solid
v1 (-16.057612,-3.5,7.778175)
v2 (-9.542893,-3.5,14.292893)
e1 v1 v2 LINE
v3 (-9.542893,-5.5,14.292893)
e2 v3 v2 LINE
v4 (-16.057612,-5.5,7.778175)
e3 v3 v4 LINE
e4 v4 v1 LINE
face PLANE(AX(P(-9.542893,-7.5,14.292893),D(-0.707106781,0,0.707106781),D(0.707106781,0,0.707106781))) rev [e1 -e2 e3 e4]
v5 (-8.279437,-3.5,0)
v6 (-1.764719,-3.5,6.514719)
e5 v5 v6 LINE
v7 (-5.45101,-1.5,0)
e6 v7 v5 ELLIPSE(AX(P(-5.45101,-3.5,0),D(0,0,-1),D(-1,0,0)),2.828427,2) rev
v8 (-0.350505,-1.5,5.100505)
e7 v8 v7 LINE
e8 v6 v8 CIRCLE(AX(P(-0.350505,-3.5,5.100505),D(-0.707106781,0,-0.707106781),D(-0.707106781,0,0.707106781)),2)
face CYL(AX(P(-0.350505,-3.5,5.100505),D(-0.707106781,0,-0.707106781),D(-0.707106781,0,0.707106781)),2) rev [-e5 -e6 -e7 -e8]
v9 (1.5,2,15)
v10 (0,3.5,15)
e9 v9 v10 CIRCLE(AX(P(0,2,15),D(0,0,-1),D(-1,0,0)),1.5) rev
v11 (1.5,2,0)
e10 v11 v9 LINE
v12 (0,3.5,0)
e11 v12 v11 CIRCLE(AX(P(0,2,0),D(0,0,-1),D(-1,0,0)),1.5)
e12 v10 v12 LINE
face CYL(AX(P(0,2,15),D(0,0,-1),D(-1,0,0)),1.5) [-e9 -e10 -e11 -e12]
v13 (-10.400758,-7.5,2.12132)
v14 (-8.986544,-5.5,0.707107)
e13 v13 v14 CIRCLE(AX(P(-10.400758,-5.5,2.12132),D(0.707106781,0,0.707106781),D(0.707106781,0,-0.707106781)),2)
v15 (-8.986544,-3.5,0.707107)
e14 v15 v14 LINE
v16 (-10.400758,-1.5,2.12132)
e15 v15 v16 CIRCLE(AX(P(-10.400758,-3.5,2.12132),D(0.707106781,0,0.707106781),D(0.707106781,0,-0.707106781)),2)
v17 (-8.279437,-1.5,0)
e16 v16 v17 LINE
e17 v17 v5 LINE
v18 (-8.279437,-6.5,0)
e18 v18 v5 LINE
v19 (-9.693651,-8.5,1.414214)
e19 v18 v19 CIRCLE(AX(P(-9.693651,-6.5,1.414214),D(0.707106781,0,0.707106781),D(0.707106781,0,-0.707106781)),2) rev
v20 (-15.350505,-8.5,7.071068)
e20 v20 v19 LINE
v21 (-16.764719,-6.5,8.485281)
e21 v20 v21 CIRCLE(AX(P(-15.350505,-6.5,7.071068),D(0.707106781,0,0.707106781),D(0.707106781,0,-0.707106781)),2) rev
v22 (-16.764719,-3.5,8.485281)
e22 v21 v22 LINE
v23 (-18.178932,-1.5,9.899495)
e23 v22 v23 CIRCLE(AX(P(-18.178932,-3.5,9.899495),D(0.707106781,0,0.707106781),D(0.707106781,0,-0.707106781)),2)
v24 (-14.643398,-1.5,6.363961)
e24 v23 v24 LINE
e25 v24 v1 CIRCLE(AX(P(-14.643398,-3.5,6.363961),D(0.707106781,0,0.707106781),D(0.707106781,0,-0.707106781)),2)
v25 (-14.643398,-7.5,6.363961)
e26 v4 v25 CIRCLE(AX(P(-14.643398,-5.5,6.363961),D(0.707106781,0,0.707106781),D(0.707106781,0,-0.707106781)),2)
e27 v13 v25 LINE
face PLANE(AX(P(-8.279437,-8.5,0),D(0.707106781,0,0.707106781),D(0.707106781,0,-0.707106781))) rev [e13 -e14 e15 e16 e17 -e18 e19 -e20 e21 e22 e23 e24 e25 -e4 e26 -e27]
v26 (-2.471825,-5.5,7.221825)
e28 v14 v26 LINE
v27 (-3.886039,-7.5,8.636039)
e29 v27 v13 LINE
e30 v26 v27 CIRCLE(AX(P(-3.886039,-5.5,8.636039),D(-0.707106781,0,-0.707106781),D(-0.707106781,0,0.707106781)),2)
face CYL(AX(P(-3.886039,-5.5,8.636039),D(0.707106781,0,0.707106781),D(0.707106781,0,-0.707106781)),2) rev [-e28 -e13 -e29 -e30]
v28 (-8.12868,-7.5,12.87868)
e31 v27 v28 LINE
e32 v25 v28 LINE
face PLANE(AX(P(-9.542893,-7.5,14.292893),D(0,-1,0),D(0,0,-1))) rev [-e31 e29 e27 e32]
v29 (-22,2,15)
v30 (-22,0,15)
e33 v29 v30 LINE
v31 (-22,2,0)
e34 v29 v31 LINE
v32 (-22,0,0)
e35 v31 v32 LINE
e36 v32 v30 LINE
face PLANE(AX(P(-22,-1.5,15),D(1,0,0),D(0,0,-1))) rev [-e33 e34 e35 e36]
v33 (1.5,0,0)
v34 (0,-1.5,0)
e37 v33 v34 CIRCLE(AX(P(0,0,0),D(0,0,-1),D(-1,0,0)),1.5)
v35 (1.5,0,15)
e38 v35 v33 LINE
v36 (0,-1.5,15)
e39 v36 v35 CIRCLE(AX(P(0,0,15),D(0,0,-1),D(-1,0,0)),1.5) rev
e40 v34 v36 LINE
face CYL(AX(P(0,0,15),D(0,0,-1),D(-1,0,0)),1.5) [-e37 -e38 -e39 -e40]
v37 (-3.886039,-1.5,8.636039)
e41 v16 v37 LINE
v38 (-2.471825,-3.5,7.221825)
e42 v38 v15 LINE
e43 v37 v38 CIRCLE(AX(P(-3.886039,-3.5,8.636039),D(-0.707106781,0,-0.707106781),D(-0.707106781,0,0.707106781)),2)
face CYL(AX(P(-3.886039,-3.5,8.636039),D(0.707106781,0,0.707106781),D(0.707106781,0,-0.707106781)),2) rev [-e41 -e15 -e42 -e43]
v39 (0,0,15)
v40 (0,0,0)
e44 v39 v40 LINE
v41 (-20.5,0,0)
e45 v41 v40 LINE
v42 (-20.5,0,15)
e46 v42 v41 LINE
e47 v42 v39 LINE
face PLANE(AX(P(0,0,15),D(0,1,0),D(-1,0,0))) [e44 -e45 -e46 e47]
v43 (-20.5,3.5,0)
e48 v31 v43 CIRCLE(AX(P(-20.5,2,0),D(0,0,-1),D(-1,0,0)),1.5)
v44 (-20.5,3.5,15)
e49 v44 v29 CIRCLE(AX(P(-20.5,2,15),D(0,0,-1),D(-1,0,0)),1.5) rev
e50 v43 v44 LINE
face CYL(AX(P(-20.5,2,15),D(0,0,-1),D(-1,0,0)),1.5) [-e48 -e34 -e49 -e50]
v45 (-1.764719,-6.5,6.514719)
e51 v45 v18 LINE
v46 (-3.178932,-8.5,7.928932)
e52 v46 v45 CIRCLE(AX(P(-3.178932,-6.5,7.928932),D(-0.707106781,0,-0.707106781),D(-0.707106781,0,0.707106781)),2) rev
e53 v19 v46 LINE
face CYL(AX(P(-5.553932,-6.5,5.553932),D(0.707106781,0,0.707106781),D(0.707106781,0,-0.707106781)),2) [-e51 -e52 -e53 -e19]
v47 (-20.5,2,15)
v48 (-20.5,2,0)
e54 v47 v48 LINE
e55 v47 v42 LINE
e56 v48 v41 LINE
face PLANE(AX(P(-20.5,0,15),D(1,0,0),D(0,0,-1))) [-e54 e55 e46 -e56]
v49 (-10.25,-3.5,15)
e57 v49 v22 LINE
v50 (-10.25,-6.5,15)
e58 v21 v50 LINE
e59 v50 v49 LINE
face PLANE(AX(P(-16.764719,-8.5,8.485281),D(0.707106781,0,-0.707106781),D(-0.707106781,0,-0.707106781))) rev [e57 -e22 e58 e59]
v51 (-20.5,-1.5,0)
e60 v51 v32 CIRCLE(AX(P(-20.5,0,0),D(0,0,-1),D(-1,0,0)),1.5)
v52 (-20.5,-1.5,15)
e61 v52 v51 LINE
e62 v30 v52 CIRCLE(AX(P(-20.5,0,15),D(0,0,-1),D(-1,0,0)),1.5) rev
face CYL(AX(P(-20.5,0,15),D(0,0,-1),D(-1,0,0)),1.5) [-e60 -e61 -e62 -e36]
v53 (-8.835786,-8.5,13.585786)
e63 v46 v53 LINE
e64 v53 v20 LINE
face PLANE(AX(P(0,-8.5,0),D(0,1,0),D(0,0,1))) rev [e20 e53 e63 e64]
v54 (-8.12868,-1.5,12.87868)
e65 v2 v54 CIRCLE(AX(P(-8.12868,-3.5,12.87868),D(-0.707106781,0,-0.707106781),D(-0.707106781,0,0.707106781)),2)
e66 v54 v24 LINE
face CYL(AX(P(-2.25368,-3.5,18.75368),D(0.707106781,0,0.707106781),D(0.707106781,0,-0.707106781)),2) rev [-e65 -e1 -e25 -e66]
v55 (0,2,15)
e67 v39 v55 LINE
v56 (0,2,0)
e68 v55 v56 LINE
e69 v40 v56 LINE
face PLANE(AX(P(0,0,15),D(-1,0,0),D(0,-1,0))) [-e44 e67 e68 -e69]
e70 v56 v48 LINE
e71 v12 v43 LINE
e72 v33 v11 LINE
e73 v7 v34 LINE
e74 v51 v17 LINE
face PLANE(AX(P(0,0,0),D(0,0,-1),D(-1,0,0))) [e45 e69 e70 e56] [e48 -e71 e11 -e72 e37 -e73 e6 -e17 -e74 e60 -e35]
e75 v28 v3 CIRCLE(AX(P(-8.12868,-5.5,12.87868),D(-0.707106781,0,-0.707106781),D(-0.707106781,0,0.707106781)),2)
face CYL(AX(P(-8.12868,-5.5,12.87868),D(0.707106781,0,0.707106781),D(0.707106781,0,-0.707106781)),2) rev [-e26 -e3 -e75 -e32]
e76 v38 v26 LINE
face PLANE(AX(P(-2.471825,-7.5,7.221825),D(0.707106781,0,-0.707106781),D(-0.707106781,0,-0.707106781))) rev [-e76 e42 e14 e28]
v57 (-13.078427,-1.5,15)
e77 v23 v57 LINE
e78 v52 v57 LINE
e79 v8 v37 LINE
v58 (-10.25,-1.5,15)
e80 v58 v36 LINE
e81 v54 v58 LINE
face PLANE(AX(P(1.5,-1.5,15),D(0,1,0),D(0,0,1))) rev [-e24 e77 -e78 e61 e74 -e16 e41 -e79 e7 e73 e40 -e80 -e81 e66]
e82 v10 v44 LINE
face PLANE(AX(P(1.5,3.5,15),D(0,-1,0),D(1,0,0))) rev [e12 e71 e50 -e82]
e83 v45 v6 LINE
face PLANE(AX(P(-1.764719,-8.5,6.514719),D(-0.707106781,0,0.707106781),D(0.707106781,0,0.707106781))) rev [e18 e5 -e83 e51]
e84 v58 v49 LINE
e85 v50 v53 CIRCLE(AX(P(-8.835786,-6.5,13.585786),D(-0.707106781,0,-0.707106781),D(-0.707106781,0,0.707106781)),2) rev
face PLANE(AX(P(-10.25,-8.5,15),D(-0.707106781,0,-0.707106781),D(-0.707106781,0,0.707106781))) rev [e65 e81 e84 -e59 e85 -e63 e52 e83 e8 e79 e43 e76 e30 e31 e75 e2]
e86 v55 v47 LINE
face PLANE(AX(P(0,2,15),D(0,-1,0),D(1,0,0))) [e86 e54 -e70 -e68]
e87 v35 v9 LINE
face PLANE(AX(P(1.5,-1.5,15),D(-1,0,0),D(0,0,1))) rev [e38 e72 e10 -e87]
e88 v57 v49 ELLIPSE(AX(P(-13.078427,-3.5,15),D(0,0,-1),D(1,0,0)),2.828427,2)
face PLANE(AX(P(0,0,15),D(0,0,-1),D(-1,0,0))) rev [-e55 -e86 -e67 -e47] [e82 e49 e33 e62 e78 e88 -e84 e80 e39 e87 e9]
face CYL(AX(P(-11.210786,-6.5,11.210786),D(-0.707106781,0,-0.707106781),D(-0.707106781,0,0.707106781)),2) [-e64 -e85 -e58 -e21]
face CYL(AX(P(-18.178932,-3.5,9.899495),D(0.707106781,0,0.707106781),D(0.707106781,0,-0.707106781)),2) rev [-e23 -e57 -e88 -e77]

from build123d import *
from OCP.BRepAlgoAPI import BRepAlgoAPI_Cut
from OCP.TopTools import TopTools_ListOfShape

# Parameters (mm, degrees)
CROQUIS1_W              = 23.5
CROQUIS1_H              = 5
CROQUIS1_W_2            = 20.5
CROQUIS1_H_2            = 2
SALIENTE_EXTRUIR1_DEPTH = 15
SALIENTE_EXTRUIR2_DEPTH = 7
CROQUIS3_W              = 10
CROQUIS3_H              = 6
CORTAR_EXTRUIR1_DEPTH   = 9.213203
REDONDEO1_START         = -5.854446225
REDONDEO1_DEPTH         = 9.213203436
REDONDEO1_2_DEPTH       = 9.213203436
REDONDEO1_3_DEPTH       = 0.946564521
REDONDEO1_START_2       = 2.41219269
REDONDEO1_4_DEPTH       = 0.946564521
REDONDEO1_5_DEPTH       = 9.213203436
REDONDEO1_START_3       = -2
REDONDEO1_6_OUTLINE_W   = 11
REDONDEO1_6_OUTLINE_H   = 2.5
REDONDEO1_6_DEPTH       = 2
REDONDEO1_START_4       = 15
REDONDEO1_7_OUTLINE_W   = 11
REDONDEO1_7_OUTLINE_H   = 2.5
REDONDEO1_7_DEPTH       = 2
REDONDEO2_R             = 1.5


with BuildPart() as part:
    # Croquis1 → Saliente-Extruir1 (new body)
    with BuildSketch(Plane.XY):
        with Locations((-10.25, 1)):
            Rectangle(CROQUIS1_W, CROQUIS1_H)
        with Locations((-10.25, 1)):
            Rectangle(CROQUIS1_W_2, CROQUIS1_H_2, mode=Mode.SUBTRACT)
    extrude(amount=SALIENTE_EXTRUIR1_DEPTH)

    # Croquis2 → Saliente-Extruir2 (add)
    with BuildSketch(Plane.XZ.offset(1.5)):
        Polygon((-10.25, 15), (-1.764718626, 6.514718626), (-8.279437252, 0), (-16.764718626, 8.485281374), align=None)
    extrude(amount=SALIENTE_EXTRUIR2_DEPTH)


with BuildPart() as cortar_extruir1_tool:
    # Croquis3 → Cortar-Extruir1 (new body)
    with BuildSketch(Plane(origin=(-4.139718626, 0, -4.139718626), x_dir=(-0.7071067811865468, 0, 0.7071067811865482), z_dir=(-0.7071067811865482, 0, -0.7071067811865468))):
        with Locations((11.854446225, -4.5)):
            Rectangle(CROQUIS3_W, CROQUIS3_H)
    extrude(amount=-CORTAR_EXTRUIR1_DEPTH)


with BuildPart() as part_1:
    add(part.part)

    # Cortar-Extruir1: cut by cortar_extruir1_tool, with a tolerance
    cortar_extruir1_stock = TopTools_ListOfShape()
    cortar_extruir1_stock.Append(part_1.part.wrapped)
    cortar_extruir1_tools = TopTools_ListOfShape()
    cortar_extruir1_tools.Append(cortar_extruir1_tool.part.wrapped)
    cortar_extruir1_cut = BRepAlgoAPI_Cut()
    cortar_extruir1_cut.SetArguments(cortar_extruir1_stock)
    cortar_extruir1_cut.SetTools(cortar_extruir1_tools)
    cortar_extruir1_cut.SetFuzzyValue(0.00001)
    cortar_extruir1_cut.Build()
    add(Compound.cast(cortar_extruir1_cut.Shape()).solids(), mode=Mode.REPLACE)

    # Redondeo1: read off the stored shape, not the designer's step
    # Redondeo1 outline → Redondeo1 (cut)
    with BuildSketch(Plane(origin=(0, 0, 0), x_dir=(0.707106781186546, 0, -0.707106781186549), z_dir=(0.707106781186549, 0, 0.707106781186546)).offset(REDONDEO1_START)):
        with BuildLine():
            Line((-17.854446225, -8.5), (-15.854446225, -8.5))
            ThreePointArc((-15.854446225, -8.5), (-17.268659787, -7.914213562), (-17.854446225, -6.5))
            Line((-17.854446225, -6.5), (-17.854446225, -8.5))
        make_face()
        with BuildLine():
            ThreePointArc((-5.854446225, -6.5), (-6.440232663, -7.914213562), (-7.854446225, -8.5))
            Line((-7.854446225, -8.5), (-5.854446225, -8.5))
            Line((-5.854446225, -8.5), (-5.854446225, -6.5))
        make_face()
    extrude(amount=REDONDEO1_DEPTH, mode=Mode.SUBTRACT)

    # Redondeo1 2 outline → Redondeo1 2 (add)
    with BuildSketch(Plane(origin=(0, 0, 0), x_dir=(0.707106781186546, 0, -0.707106781186549), z_dir=(0.707106781186549, 0, 0.707106781186546)).offset(REDONDEO1_START)):
        with BuildLine():
            Line((-14.854446225, -1.5), (-16.854446225, -1.5))
            Line((-16.854446225, -1.5), (-16.854446225, -3.5))
            ThreePointArc((-16.854446225, -3.5), (-16.268659787, -2.085786438), (-14.854446225, -1.5))
        make_face()
        with BuildLine():
            Line((-6.854446225, -3.5), (-6.854446225, -1.5))
            Line((-6.854446225, -1.5), (-8.854446225, -1.5))
            ThreePointArc((-8.854446225, -1.5), (-7.440232663, -2.085786438), (-6.854446225, -3.5))
        make_face()
        with BuildLine():
            ThreePointArc((-14.854446225, -7.5), (-16.268659787, -6.914213562), (-16.854446225, -5.5))
            Line((-16.854446225, -5.5), (-16.854446225, -7.5))
            Line((-16.854446225, -7.5), (-14.854446225, -7.5))
        make_face()
        with BuildLine():
            Line((-6.854446225, -7.5), (-6.854446225, -5.5))
            ThreePointArc((-6.854446225, -5.5), (-7.440232663, -6.914213562), (-8.854446225, -7.5))
            Line((-8.854446225, -7.5), (-6.854446225, -7.5))
        make_face()
    extrude(amount=REDONDEO1_2_DEPTH)

    # Redondeo1 3 outline → Redondeo1 3 (add)
    with BuildSketch(Plane(origin=(0, 0, 0), x_dir=(0.707106781186546, 0, -0.707106781186549), z_dir=(0.707106781186549, 0, 0.707106781186546)).offset(REDONDEO1_START)):
        with BuildLine():
            ThreePointArc((-19.854446225, -1.5), (-18.440232663, -2.085786438), (-17.854446225, -3.5))
            Line((-17.854446225, -3.5), (-17.854446225, -1.5))
            Line((-17.854446225, -1.5), (-19.854446225, -1.5))
        make_face()
    extrude(amount=REDONDEO1_3_DEPTH)

    # Redondeo1 4 outline → Redondeo1 4 (add)
    with BuildSketch(Plane(origin=(0, 0, 0), x_dir=(0.707106781186546, 0, -0.707106781186549), z_dir=(0.707106781186549, 0, 0.707106781186546)).offset(REDONDEO1_START_2)):
        with BuildLine():
            Line((-5.854446225, -1.5), (-5.854446225, -3.5))
            ThreePointArc((-5.854446225, -3.5), (-5.268659787, -2.085786438), (-3.854446225, -1.5))
            Line((-3.854446225, -1.5), (-5.854446225, -1.5))
        make_face()
    extrude(amount=REDONDEO1_4_DEPTH)

    # Redondeo1 5 outline → Redondeo1 5 (add)
    with BuildSketch(Plane(origin=(0, 0, 0), x_dir=(0.7071067811865471, 0, -0.707106781186548), z_dir=(0.707106781186548, 0, 0.707106781186547)).offset(REDONDEO1_START)):
        with BuildLine():
            Line((-5.854446225, -1.5), (-5.854446225, -3.5))
            ThreePointArc((-5.854446225, -3.5), (-5.268659787, -2.085786438), (-3.854446225, -1.5))
            Line((-3.854446225, -1.5), (-5.854446225, -1.5))
        make_face()
        with BuildLine():
            Line((-17.854446225, -3.5), (-17.854446225, -1.5))
            Line((-17.854446225, -1.5), (-19.854446225, -1.5))
            ThreePointArc((-19.854446225, -1.5), (-18.440232663, -2.085786438), (-17.854446225, -3.5))
        make_face()
    extrude(amount=REDONDEO1_5_DEPTH)

    # Redondeo1 6 outline → Redondeo1 6 (cut)
    with BuildSketch(Plane.XY.offset(REDONDEO1_START_3)):
        with Locations((-9.5, -2.75)):
            Rectangle(REDONDEO1_6_OUTLINE_W, REDONDEO1_6_OUTLINE_H)
    extrude(amount=REDONDEO1_6_DEPTH, mode=Mode.SUBTRACT)

    # Redondeo1 7 outline → Redondeo1 7 (cut)
    with BuildSketch(Plane.XY.offset(REDONDEO1_START_4)):
        with Locations((-9.5, -2.75)):
            Rectangle(REDONDEO1_7_OUTLINE_W, REDONDEO1_7_OUTLINE_H)
    extrude(amount=REDONDEO1_7_DEPTH, mode=Mode.SUBTRACT)

    # Redondeo2
    redondeo2_edges = [part_1.edges().sort_by_distance(p)[0] for p in [
        (-22, -1.5, 7.5),
        (-22, 3.5, 7.5),
        (1.5, 3.5, 7.5),
        (1.5, -1.5, 7.5),
    ]]
    fillet(redondeo2_edges, radius=REDONDEO2_R)


solid = part_1.part
